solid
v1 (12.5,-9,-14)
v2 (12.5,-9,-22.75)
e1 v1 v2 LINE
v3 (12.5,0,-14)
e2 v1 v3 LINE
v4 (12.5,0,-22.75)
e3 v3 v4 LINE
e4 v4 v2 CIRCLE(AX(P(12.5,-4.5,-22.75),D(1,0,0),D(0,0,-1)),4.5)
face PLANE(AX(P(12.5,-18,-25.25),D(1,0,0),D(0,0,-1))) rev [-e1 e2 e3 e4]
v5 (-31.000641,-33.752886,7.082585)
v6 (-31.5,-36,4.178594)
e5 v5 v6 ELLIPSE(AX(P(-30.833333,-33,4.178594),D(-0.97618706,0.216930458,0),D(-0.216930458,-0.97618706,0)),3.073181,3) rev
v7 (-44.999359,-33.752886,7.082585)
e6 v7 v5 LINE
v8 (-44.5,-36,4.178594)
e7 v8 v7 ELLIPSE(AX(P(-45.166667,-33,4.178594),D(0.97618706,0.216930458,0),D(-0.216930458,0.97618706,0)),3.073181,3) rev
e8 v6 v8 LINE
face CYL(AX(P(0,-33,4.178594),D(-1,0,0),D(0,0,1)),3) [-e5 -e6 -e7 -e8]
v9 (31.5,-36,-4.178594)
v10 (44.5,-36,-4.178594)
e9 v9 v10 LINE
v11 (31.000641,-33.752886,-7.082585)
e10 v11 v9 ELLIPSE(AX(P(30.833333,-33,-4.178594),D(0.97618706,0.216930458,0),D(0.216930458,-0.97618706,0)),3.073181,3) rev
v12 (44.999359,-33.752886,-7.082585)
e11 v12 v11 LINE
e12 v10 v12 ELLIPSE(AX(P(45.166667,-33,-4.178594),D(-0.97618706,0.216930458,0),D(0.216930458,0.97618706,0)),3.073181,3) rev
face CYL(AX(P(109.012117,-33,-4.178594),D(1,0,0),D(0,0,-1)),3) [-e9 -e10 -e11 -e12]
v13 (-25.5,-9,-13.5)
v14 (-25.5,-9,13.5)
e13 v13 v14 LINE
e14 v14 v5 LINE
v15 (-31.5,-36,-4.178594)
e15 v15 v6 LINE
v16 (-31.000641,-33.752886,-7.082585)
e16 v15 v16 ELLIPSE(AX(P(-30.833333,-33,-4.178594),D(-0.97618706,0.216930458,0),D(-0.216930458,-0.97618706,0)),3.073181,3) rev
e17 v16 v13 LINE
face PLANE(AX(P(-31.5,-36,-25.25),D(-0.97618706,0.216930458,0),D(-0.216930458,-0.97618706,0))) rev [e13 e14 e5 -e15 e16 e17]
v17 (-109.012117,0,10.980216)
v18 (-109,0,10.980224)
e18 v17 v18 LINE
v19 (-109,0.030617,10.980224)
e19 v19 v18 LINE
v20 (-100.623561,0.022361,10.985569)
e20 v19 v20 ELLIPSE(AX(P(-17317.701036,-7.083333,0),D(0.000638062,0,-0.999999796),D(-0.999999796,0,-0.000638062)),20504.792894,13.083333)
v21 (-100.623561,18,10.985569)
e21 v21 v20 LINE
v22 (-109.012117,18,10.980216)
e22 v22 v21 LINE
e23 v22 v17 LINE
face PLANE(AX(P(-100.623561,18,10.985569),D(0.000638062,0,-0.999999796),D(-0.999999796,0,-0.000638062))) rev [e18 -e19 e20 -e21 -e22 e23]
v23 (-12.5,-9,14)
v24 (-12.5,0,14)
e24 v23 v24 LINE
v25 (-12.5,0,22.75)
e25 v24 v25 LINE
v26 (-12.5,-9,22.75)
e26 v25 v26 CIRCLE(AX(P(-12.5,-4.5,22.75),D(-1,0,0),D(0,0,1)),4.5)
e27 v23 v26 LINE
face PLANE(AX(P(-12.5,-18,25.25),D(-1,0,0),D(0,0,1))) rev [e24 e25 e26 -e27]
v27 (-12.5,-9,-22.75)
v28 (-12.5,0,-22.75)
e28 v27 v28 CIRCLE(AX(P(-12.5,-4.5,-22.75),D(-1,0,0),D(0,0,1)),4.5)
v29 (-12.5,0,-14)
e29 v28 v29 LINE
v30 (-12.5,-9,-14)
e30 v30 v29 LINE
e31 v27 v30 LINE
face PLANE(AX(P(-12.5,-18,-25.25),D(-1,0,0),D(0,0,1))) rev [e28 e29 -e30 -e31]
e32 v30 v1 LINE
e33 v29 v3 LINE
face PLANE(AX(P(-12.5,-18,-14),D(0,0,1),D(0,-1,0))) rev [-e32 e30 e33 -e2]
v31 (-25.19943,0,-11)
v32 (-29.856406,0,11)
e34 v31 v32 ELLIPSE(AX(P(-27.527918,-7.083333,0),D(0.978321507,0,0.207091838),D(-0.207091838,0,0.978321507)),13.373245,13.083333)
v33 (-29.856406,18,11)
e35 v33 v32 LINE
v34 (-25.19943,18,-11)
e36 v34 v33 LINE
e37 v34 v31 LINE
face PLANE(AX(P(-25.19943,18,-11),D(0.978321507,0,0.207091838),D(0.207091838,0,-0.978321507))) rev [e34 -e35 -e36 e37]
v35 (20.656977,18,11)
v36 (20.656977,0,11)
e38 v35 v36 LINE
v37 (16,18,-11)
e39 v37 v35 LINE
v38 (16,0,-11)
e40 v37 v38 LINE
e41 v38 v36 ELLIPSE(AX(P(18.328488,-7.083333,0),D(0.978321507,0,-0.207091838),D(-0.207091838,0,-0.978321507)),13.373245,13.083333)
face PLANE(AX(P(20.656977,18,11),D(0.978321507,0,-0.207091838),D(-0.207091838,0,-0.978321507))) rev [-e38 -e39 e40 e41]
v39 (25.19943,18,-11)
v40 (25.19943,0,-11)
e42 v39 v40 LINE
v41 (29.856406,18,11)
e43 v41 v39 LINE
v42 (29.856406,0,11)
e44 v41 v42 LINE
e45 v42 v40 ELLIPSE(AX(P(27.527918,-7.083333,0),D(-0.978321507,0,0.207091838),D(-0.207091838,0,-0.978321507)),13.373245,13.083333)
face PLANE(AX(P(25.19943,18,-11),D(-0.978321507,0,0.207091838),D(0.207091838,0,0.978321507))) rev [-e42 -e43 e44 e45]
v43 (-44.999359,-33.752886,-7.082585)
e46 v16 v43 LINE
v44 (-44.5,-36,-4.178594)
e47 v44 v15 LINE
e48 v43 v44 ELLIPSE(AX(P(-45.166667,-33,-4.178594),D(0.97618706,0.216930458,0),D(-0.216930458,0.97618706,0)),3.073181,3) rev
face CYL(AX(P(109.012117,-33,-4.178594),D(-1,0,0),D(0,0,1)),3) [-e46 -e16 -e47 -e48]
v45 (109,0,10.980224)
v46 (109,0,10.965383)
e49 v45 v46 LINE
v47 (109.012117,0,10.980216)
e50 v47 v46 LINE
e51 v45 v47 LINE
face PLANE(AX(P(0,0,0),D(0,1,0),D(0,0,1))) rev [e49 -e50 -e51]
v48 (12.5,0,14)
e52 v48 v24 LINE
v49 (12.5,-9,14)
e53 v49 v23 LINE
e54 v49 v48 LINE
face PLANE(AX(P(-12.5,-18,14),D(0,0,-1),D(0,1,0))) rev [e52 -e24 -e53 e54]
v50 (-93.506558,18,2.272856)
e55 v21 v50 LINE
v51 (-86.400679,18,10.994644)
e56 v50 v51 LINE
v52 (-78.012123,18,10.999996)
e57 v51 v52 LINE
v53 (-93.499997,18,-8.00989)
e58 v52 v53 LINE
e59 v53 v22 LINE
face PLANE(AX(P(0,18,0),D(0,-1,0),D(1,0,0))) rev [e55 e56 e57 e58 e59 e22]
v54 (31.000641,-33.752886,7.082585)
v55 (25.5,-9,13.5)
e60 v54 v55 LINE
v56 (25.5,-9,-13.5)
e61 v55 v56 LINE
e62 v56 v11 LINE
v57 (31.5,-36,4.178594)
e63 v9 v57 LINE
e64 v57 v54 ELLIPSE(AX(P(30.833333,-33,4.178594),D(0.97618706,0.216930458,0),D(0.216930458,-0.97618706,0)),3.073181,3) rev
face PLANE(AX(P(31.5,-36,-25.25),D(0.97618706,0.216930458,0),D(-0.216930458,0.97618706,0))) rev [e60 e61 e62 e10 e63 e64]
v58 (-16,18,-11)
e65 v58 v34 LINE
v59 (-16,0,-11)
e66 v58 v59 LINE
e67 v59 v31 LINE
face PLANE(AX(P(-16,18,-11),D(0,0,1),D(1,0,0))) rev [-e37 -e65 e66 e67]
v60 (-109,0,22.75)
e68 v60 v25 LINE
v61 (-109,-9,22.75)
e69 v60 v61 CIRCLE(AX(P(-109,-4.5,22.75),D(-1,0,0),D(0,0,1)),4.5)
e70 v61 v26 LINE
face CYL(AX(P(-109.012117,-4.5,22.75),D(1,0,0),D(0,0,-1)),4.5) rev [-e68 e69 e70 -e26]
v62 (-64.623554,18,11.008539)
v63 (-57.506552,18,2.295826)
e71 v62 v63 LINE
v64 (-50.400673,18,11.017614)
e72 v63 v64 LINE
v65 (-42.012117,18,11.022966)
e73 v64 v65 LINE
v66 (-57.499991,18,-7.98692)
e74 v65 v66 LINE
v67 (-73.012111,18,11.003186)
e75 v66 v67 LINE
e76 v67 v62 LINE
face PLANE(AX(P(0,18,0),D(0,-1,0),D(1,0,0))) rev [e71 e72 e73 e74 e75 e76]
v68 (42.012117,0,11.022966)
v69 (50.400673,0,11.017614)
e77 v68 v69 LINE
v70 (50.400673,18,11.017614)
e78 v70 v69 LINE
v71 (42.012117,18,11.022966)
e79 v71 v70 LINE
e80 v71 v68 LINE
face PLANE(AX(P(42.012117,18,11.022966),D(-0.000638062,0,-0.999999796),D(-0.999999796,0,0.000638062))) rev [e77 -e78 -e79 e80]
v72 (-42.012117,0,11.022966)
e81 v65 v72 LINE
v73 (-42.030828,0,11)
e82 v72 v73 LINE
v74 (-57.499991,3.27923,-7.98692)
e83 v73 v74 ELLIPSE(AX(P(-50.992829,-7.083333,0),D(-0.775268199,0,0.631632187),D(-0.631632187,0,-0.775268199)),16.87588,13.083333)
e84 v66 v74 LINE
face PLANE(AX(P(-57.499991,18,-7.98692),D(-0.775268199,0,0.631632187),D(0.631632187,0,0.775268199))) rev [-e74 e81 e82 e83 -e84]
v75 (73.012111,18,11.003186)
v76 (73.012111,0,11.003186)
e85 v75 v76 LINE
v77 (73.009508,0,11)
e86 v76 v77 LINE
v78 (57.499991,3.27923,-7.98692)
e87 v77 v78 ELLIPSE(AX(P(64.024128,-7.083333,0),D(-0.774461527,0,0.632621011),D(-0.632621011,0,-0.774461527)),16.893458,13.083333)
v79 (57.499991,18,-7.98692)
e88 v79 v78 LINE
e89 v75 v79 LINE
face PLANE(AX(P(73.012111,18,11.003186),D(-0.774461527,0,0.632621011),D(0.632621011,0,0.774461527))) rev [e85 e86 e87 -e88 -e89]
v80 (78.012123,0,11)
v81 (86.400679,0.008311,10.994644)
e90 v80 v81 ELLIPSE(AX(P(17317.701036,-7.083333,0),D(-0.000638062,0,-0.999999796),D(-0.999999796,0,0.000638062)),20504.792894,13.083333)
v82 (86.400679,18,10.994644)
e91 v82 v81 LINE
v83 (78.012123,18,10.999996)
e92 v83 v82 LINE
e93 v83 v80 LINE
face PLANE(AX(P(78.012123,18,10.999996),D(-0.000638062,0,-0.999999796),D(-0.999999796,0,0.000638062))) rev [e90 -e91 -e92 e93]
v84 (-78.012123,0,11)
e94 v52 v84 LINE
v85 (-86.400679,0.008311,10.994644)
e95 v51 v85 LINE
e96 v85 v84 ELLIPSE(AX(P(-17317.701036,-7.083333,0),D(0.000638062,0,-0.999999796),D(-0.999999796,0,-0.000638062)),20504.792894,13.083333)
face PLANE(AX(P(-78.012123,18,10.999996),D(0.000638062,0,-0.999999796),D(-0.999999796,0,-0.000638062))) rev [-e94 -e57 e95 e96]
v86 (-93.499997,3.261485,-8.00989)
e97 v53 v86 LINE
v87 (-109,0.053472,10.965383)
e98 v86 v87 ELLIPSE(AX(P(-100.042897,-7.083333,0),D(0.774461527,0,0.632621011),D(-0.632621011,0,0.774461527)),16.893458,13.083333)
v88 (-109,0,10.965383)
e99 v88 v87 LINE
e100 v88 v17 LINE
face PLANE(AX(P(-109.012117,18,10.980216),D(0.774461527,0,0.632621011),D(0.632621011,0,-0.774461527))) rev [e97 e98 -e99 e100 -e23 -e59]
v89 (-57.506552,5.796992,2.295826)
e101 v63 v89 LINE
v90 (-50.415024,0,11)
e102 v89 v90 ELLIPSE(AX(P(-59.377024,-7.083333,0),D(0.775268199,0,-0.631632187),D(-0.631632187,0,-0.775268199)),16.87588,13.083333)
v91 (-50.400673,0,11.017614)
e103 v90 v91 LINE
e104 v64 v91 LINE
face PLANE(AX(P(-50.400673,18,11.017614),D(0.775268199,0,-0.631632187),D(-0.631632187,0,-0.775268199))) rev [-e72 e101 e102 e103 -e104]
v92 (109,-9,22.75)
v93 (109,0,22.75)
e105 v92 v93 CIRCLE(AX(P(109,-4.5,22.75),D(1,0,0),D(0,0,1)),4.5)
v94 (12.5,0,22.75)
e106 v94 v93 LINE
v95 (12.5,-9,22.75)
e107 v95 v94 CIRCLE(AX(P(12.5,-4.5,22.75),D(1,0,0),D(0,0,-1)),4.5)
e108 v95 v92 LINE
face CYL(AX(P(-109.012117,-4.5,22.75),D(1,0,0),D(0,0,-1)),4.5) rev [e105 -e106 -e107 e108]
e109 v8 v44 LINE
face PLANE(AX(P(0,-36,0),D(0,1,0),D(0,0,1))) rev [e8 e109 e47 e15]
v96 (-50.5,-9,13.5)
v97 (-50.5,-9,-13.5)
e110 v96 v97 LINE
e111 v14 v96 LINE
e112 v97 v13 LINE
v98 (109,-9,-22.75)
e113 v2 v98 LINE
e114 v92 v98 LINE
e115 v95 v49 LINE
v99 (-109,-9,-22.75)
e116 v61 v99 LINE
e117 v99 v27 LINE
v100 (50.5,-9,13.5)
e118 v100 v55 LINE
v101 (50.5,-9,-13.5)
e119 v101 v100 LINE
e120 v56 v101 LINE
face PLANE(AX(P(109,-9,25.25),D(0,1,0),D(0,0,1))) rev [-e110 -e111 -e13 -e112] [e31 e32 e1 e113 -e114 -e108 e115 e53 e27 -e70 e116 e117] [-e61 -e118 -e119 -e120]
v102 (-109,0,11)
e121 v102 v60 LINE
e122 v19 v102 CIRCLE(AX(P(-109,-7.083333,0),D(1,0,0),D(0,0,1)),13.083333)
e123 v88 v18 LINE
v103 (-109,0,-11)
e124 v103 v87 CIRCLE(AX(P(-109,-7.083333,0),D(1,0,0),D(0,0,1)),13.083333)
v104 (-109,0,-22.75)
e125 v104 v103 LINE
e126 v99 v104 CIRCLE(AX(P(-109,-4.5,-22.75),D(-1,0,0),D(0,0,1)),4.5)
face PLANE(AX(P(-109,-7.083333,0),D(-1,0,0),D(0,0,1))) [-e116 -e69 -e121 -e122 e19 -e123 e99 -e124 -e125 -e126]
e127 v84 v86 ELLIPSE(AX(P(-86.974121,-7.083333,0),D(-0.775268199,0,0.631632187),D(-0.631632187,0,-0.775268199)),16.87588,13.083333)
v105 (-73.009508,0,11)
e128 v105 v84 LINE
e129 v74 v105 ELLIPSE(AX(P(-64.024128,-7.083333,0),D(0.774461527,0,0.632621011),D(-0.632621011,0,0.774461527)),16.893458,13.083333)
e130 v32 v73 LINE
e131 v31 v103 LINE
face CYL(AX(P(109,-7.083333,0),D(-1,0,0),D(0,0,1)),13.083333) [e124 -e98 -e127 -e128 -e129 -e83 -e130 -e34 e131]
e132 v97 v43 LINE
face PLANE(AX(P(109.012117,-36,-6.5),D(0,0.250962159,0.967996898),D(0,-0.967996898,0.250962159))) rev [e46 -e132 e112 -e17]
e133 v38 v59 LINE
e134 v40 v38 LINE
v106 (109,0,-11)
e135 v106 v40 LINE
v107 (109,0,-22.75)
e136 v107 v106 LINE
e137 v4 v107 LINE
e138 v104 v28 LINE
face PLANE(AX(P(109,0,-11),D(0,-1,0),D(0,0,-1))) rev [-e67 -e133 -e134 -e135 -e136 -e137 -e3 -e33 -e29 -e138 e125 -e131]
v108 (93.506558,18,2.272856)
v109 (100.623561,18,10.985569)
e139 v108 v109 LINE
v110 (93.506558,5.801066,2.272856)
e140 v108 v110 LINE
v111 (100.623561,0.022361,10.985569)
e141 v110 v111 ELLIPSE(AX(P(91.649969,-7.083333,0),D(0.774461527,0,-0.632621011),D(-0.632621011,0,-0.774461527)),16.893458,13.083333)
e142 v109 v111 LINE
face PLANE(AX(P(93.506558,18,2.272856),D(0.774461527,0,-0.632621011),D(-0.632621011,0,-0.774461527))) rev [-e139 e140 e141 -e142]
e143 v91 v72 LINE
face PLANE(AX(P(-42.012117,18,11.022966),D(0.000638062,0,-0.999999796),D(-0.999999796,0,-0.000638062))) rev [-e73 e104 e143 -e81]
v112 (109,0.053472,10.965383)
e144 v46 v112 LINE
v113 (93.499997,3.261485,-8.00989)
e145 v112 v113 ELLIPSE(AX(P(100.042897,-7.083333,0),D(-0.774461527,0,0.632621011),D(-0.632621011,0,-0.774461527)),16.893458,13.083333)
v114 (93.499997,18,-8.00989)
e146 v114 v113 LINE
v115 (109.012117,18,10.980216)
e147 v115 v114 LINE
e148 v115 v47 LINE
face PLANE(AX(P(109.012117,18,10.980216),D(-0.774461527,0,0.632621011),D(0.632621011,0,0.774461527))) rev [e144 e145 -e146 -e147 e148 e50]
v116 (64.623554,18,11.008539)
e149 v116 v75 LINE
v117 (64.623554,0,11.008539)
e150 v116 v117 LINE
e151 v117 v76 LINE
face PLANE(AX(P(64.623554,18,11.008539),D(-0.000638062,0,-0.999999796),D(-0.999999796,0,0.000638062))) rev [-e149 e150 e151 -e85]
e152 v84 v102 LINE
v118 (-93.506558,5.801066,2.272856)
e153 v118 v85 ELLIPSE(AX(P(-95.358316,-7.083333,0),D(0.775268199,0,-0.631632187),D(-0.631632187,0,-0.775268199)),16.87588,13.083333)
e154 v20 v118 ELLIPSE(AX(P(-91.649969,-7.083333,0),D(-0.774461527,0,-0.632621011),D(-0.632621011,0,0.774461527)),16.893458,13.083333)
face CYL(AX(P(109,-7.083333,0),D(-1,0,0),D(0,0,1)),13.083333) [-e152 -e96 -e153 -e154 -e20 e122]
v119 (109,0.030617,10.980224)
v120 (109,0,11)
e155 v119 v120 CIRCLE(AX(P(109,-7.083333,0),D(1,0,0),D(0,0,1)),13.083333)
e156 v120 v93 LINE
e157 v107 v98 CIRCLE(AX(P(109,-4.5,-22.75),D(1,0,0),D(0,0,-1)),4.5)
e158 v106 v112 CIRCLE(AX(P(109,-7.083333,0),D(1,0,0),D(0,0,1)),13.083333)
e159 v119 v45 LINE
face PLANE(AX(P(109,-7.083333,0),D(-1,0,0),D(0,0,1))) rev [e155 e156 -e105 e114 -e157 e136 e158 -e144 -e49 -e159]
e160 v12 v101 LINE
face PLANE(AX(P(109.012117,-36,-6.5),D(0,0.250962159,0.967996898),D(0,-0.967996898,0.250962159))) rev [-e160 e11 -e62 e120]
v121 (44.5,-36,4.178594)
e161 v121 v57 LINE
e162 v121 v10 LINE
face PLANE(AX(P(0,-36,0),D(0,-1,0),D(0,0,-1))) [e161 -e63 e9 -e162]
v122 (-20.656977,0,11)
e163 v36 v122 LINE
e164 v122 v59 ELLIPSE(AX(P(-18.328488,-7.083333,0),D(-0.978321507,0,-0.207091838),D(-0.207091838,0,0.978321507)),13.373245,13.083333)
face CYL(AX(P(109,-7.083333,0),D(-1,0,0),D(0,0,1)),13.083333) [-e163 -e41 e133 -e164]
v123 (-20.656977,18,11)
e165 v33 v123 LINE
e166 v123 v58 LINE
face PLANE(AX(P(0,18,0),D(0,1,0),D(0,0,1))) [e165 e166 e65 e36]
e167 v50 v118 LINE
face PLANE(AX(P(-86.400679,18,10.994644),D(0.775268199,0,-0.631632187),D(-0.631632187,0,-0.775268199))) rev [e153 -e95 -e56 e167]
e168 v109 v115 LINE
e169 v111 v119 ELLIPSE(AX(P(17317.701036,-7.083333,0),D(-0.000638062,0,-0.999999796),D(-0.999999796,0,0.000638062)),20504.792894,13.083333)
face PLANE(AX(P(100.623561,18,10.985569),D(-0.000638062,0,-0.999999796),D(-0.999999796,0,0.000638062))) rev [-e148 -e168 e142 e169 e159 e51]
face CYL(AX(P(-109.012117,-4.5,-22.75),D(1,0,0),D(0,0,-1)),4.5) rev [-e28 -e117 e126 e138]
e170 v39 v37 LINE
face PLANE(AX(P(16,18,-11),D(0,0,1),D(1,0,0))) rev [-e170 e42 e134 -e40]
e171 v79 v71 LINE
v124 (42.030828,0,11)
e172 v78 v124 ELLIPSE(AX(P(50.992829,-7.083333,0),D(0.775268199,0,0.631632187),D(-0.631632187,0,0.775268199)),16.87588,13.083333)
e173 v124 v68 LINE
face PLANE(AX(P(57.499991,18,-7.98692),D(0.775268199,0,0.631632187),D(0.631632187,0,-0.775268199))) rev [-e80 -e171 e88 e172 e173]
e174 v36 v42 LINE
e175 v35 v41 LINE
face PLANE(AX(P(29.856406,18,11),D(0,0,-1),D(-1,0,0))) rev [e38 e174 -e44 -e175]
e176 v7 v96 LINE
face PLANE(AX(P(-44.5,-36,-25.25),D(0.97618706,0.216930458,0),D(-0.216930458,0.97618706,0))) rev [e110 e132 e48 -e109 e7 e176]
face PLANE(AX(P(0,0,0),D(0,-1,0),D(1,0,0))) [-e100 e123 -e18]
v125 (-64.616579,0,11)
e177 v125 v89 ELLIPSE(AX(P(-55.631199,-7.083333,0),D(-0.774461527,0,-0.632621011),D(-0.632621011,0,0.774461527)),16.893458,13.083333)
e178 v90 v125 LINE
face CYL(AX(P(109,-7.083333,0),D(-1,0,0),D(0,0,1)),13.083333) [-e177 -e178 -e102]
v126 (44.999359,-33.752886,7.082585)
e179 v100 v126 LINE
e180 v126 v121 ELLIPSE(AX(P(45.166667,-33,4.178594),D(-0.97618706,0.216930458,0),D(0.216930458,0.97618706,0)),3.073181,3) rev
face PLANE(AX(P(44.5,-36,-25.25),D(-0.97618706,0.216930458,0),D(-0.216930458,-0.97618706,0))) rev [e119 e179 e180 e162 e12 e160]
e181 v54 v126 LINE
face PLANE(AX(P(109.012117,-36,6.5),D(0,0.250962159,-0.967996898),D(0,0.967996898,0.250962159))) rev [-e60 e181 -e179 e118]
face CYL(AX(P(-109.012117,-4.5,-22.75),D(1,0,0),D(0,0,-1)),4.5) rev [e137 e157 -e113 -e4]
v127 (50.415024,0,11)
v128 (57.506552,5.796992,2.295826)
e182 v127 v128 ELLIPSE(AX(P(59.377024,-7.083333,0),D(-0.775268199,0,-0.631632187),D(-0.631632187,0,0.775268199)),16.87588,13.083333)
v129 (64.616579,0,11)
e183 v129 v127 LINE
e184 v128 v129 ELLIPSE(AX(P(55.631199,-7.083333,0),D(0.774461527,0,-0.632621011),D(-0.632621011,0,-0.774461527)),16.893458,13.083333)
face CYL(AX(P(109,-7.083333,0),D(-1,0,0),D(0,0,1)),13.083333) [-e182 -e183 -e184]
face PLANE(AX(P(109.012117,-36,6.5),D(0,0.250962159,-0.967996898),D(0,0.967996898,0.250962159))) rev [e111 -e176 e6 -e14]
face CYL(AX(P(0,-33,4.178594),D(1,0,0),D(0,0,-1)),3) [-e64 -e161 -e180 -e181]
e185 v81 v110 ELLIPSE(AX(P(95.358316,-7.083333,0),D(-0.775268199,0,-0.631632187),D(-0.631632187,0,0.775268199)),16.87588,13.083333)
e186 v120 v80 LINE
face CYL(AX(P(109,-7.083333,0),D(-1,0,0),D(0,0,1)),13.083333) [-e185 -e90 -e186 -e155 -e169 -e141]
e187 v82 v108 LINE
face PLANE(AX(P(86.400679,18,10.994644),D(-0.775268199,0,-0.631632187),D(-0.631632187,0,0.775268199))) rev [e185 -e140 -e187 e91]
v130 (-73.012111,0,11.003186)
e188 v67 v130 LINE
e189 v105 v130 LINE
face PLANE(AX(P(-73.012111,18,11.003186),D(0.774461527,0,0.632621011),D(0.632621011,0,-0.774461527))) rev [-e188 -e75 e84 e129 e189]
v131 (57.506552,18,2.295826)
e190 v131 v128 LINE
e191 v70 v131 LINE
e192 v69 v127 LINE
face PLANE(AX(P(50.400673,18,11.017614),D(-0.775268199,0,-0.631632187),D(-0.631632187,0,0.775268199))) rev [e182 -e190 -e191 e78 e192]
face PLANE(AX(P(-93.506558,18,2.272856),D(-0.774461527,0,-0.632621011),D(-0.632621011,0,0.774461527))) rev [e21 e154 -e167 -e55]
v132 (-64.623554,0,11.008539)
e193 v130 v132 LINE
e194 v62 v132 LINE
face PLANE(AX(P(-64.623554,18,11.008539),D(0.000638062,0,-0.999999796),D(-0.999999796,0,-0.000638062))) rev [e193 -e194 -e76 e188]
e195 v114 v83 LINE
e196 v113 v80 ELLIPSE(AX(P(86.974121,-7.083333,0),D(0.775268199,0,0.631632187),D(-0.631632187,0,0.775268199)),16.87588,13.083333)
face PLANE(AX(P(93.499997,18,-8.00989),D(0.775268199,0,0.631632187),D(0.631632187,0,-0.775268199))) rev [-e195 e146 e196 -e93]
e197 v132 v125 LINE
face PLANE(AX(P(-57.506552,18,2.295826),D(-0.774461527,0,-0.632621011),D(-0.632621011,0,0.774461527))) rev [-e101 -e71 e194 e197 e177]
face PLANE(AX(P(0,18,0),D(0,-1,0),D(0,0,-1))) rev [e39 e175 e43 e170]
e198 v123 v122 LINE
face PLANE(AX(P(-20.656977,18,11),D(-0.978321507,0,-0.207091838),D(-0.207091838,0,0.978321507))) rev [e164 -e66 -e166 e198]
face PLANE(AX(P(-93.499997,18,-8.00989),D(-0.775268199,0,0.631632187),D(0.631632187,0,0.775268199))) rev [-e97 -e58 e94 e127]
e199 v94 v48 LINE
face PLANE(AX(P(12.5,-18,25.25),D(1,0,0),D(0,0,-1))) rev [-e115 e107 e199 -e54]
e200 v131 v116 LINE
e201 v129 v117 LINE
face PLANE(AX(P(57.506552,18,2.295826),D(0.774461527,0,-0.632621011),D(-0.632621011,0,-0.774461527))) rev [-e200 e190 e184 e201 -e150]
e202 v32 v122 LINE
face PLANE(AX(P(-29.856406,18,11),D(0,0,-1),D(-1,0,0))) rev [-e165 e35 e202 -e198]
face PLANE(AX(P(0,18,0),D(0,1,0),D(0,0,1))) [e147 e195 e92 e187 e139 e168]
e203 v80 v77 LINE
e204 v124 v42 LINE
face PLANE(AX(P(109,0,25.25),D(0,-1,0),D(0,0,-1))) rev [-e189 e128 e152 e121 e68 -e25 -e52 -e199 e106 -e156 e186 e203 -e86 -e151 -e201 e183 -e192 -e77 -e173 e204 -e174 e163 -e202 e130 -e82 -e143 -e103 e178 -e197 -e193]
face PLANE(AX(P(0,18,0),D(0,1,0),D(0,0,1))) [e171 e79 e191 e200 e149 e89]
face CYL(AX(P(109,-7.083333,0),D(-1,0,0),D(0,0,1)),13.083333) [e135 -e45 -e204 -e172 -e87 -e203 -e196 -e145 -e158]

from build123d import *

# Parameters (mm, degrees)
EXTRUDE_1_DEPTH     = 109
EXTRUDE_2_DEPTH     = 18
SKETCH_3_W          = 25
SKETCH_3_H          = 11.25
CUT_EXTRUDE_1_DEPTH = 18
SKETCH_4_W          = 25
SKETCH_4_H          = 27
EXTRUDE_3_DEPTH     = 27
CUT_EXTRUDE_2_DEPTH = 122.166018853
CUT_EXTRUDE_3_DEPTH = 166.462013552
FILLET_1_R          = 3
CUT_EXTRUDE_4_DEPTH = 223.40244064


# Read off the part's stored shape, not the designer's step: Бобышка-Вытянуть2
with BuildPart() as part:
    # Эскиз1 → Бобышка-Вытянуть1 (new, symmetric)
    with BuildSketch(Plane(origin=(0, 0, 0), x_dir=(0, 0, -1), z_dir=(1, 0, 0))):
        with BuildLine():
            Line((11, 0), (25.25, 0))
            Line((25.25, 0), (25.25, -9))
            Line((25.25, -9), (-25.25, -9))
            Line((-25.25, -9), (-25.25, 0))
            Line((-25.25, 0), (-11, 0))
            ThreePointArc((-11, 0), (0, 6), (11, 0))
        make_face()
    extrude(amount=EXTRUDE_1_DEPTH, both=True)

    # Бобышка-Вытянуть2 outline → Бобышка-Вытянуть2 (add)
    with BuildSketch(Plane(origin=(0, 0, 0), x_dir=(1, 0, 0), z_dir=(0, 1, 0))):
        Polygon((16, 11), (20.656976684, -11), (29.856406461, -11), (25.199429777, 11), align=None)
        Polygon((-29.856406461, -11), (-20.656976684, -11), (-16, 11), (-25.199429777, 11), align=None)
        Polygon((78.012123179, -10.999996132), (86.400679256, -10.994643711), (93.506557878, -2.272856192), (100.623560797, -10.985568626), (109.012116871, -10.980216204), (93.499996845, 8.009889964), align=None)
        Polygon((64.623554487, -11.008538874), (73.012110561, -11.003186452), (57.499990534, 7.986919716), (42.012116871, -11.02296638), (50.400672946, -11.017613959), (57.506551567, -2.29582644), align=None)
        Polygon((-109.012116871, -10.980216204), (-100.623560797, -10.985568626), (-93.506557878, -2.272856192), (-86.400679256, -10.994643711), (-78.012123179, -10.999996132), (-93.499996845, 8.009889964), align=None)
        Polygon((-73.012110561, -11.003186452), (-64.623554487, -11.008538874), (-57.506551567, -2.29582644), (-50.400672946, -11.017613959), (-42.012116871, -11.02296638), (-57.499990534, 7.986919716), align=None)
    extrude(amount=EXTRUDE_2_DEPTH)

    # Эскиз3 → Вырез-Вытянуть1 (cut)
    with BuildSketch(Plane(origin=(0, 0, 0), x_dir=(1, 0, 0), z_dir=(0, 1, 0))):
        with Locations((0, 19.625)):
            Rectangle(SKETCH_3_W, SKETCH_3_H)
        with Locations((0, -19.625)):
            Rectangle(SKETCH_3_W, SKETCH_3_H)
    extrude(amount=-CUT_EXTRUDE_1_DEPTH, mode=Mode.SUBTRACT)

    # Эскиз4 → Бобышка-Вытянуть3 (add)
    with BuildSketch(Plane.XZ.offset(9)):
        with Locations((38, 0)):
            Rectangle(SKETCH_4_W, SKETCH_4_H)
        with Locations((-38, 0)):
            Rectangle(SKETCH_4_W, SKETCH_4_H)
    extrude(amount=EXTRUDE_3_DEPTH)

    # Эскиз6 → Вырез-Вытянуть2 (cut, through all)
    with BuildSketch(Plane.XY.offset(13.5)):
        Polygon((-50.5, -9), (-50.5, -36), (-44.5, -36), align=None)
        Polygon((-25.5, -36), (-31.5, -36), (-25.5, -9), align=None)
        Polygon((25.5, -9), (25.5, -36), (31.5, -36), align=None)
        Polygon((50.5, -36), (44.5, -36), (50.5, -9), align=None)
    extrude(amount=-CUT_EXTRUDE_2_DEPTH, mode=Mode.SUBTRACT)

    # Эскиз5 → Вырез-Вытянуть3 (cut, through all)
    with BuildSketch(Plane.ZY.offset(50.5)):
        Polygon((-13.5, -9), (-13.5, -36), (-6.5, -36), align=None)
        Polygon((13.5, -36), (6.5, -36), (13.5, -9), align=None)
    extrude(amount=-CUT_EXTRUDE_3_DEPTH, mode=Mode.SUBTRACT)

    # Скругление1
    fillet_1_edges = [part.edges().sort_by_distance(p)[0] for p in [
        (-38, -36, -6.5),
        (38, -36, -6.5),
        (-38, -36, 6.5),
        (38, -36, 6.5),
    ]]
    fillet(fillet_1_edges, radius=FILLET_1_R)

    # Эскиз8 → Вырез-Вытянуть4 (cut, through all)
    with BuildSketch(Plane(origin=(109, 0, 0), x_dir=(0, 0, -1), z_dir=(1, 0, 0))):
        with BuildLine():
            Line((-22.75, -9), (-25.25, -9))
            Line((-25.25, -9), (-25.25, 0))
            Line((-25.25, 0), (-22.75, 0))
            ThreePointArc((-22.75, 0), (-18.25, -4.5), (-22.75, -9))
        make_face()
        with BuildLine():
            Line((22.75, -9), (25.25, -9))
            Line((25.25, -9), (25.25, 0))
            Line((25.25, 0), (22.75, 0))
            ThreePointArc((22.75, 0), (18.25, -4.5), (22.75, -9))
        make_face()
    extrude(amount=-CUT_EXTRUDE_4_DEPTH, mode=Mode.SUBTRACT)


solid = part.part
